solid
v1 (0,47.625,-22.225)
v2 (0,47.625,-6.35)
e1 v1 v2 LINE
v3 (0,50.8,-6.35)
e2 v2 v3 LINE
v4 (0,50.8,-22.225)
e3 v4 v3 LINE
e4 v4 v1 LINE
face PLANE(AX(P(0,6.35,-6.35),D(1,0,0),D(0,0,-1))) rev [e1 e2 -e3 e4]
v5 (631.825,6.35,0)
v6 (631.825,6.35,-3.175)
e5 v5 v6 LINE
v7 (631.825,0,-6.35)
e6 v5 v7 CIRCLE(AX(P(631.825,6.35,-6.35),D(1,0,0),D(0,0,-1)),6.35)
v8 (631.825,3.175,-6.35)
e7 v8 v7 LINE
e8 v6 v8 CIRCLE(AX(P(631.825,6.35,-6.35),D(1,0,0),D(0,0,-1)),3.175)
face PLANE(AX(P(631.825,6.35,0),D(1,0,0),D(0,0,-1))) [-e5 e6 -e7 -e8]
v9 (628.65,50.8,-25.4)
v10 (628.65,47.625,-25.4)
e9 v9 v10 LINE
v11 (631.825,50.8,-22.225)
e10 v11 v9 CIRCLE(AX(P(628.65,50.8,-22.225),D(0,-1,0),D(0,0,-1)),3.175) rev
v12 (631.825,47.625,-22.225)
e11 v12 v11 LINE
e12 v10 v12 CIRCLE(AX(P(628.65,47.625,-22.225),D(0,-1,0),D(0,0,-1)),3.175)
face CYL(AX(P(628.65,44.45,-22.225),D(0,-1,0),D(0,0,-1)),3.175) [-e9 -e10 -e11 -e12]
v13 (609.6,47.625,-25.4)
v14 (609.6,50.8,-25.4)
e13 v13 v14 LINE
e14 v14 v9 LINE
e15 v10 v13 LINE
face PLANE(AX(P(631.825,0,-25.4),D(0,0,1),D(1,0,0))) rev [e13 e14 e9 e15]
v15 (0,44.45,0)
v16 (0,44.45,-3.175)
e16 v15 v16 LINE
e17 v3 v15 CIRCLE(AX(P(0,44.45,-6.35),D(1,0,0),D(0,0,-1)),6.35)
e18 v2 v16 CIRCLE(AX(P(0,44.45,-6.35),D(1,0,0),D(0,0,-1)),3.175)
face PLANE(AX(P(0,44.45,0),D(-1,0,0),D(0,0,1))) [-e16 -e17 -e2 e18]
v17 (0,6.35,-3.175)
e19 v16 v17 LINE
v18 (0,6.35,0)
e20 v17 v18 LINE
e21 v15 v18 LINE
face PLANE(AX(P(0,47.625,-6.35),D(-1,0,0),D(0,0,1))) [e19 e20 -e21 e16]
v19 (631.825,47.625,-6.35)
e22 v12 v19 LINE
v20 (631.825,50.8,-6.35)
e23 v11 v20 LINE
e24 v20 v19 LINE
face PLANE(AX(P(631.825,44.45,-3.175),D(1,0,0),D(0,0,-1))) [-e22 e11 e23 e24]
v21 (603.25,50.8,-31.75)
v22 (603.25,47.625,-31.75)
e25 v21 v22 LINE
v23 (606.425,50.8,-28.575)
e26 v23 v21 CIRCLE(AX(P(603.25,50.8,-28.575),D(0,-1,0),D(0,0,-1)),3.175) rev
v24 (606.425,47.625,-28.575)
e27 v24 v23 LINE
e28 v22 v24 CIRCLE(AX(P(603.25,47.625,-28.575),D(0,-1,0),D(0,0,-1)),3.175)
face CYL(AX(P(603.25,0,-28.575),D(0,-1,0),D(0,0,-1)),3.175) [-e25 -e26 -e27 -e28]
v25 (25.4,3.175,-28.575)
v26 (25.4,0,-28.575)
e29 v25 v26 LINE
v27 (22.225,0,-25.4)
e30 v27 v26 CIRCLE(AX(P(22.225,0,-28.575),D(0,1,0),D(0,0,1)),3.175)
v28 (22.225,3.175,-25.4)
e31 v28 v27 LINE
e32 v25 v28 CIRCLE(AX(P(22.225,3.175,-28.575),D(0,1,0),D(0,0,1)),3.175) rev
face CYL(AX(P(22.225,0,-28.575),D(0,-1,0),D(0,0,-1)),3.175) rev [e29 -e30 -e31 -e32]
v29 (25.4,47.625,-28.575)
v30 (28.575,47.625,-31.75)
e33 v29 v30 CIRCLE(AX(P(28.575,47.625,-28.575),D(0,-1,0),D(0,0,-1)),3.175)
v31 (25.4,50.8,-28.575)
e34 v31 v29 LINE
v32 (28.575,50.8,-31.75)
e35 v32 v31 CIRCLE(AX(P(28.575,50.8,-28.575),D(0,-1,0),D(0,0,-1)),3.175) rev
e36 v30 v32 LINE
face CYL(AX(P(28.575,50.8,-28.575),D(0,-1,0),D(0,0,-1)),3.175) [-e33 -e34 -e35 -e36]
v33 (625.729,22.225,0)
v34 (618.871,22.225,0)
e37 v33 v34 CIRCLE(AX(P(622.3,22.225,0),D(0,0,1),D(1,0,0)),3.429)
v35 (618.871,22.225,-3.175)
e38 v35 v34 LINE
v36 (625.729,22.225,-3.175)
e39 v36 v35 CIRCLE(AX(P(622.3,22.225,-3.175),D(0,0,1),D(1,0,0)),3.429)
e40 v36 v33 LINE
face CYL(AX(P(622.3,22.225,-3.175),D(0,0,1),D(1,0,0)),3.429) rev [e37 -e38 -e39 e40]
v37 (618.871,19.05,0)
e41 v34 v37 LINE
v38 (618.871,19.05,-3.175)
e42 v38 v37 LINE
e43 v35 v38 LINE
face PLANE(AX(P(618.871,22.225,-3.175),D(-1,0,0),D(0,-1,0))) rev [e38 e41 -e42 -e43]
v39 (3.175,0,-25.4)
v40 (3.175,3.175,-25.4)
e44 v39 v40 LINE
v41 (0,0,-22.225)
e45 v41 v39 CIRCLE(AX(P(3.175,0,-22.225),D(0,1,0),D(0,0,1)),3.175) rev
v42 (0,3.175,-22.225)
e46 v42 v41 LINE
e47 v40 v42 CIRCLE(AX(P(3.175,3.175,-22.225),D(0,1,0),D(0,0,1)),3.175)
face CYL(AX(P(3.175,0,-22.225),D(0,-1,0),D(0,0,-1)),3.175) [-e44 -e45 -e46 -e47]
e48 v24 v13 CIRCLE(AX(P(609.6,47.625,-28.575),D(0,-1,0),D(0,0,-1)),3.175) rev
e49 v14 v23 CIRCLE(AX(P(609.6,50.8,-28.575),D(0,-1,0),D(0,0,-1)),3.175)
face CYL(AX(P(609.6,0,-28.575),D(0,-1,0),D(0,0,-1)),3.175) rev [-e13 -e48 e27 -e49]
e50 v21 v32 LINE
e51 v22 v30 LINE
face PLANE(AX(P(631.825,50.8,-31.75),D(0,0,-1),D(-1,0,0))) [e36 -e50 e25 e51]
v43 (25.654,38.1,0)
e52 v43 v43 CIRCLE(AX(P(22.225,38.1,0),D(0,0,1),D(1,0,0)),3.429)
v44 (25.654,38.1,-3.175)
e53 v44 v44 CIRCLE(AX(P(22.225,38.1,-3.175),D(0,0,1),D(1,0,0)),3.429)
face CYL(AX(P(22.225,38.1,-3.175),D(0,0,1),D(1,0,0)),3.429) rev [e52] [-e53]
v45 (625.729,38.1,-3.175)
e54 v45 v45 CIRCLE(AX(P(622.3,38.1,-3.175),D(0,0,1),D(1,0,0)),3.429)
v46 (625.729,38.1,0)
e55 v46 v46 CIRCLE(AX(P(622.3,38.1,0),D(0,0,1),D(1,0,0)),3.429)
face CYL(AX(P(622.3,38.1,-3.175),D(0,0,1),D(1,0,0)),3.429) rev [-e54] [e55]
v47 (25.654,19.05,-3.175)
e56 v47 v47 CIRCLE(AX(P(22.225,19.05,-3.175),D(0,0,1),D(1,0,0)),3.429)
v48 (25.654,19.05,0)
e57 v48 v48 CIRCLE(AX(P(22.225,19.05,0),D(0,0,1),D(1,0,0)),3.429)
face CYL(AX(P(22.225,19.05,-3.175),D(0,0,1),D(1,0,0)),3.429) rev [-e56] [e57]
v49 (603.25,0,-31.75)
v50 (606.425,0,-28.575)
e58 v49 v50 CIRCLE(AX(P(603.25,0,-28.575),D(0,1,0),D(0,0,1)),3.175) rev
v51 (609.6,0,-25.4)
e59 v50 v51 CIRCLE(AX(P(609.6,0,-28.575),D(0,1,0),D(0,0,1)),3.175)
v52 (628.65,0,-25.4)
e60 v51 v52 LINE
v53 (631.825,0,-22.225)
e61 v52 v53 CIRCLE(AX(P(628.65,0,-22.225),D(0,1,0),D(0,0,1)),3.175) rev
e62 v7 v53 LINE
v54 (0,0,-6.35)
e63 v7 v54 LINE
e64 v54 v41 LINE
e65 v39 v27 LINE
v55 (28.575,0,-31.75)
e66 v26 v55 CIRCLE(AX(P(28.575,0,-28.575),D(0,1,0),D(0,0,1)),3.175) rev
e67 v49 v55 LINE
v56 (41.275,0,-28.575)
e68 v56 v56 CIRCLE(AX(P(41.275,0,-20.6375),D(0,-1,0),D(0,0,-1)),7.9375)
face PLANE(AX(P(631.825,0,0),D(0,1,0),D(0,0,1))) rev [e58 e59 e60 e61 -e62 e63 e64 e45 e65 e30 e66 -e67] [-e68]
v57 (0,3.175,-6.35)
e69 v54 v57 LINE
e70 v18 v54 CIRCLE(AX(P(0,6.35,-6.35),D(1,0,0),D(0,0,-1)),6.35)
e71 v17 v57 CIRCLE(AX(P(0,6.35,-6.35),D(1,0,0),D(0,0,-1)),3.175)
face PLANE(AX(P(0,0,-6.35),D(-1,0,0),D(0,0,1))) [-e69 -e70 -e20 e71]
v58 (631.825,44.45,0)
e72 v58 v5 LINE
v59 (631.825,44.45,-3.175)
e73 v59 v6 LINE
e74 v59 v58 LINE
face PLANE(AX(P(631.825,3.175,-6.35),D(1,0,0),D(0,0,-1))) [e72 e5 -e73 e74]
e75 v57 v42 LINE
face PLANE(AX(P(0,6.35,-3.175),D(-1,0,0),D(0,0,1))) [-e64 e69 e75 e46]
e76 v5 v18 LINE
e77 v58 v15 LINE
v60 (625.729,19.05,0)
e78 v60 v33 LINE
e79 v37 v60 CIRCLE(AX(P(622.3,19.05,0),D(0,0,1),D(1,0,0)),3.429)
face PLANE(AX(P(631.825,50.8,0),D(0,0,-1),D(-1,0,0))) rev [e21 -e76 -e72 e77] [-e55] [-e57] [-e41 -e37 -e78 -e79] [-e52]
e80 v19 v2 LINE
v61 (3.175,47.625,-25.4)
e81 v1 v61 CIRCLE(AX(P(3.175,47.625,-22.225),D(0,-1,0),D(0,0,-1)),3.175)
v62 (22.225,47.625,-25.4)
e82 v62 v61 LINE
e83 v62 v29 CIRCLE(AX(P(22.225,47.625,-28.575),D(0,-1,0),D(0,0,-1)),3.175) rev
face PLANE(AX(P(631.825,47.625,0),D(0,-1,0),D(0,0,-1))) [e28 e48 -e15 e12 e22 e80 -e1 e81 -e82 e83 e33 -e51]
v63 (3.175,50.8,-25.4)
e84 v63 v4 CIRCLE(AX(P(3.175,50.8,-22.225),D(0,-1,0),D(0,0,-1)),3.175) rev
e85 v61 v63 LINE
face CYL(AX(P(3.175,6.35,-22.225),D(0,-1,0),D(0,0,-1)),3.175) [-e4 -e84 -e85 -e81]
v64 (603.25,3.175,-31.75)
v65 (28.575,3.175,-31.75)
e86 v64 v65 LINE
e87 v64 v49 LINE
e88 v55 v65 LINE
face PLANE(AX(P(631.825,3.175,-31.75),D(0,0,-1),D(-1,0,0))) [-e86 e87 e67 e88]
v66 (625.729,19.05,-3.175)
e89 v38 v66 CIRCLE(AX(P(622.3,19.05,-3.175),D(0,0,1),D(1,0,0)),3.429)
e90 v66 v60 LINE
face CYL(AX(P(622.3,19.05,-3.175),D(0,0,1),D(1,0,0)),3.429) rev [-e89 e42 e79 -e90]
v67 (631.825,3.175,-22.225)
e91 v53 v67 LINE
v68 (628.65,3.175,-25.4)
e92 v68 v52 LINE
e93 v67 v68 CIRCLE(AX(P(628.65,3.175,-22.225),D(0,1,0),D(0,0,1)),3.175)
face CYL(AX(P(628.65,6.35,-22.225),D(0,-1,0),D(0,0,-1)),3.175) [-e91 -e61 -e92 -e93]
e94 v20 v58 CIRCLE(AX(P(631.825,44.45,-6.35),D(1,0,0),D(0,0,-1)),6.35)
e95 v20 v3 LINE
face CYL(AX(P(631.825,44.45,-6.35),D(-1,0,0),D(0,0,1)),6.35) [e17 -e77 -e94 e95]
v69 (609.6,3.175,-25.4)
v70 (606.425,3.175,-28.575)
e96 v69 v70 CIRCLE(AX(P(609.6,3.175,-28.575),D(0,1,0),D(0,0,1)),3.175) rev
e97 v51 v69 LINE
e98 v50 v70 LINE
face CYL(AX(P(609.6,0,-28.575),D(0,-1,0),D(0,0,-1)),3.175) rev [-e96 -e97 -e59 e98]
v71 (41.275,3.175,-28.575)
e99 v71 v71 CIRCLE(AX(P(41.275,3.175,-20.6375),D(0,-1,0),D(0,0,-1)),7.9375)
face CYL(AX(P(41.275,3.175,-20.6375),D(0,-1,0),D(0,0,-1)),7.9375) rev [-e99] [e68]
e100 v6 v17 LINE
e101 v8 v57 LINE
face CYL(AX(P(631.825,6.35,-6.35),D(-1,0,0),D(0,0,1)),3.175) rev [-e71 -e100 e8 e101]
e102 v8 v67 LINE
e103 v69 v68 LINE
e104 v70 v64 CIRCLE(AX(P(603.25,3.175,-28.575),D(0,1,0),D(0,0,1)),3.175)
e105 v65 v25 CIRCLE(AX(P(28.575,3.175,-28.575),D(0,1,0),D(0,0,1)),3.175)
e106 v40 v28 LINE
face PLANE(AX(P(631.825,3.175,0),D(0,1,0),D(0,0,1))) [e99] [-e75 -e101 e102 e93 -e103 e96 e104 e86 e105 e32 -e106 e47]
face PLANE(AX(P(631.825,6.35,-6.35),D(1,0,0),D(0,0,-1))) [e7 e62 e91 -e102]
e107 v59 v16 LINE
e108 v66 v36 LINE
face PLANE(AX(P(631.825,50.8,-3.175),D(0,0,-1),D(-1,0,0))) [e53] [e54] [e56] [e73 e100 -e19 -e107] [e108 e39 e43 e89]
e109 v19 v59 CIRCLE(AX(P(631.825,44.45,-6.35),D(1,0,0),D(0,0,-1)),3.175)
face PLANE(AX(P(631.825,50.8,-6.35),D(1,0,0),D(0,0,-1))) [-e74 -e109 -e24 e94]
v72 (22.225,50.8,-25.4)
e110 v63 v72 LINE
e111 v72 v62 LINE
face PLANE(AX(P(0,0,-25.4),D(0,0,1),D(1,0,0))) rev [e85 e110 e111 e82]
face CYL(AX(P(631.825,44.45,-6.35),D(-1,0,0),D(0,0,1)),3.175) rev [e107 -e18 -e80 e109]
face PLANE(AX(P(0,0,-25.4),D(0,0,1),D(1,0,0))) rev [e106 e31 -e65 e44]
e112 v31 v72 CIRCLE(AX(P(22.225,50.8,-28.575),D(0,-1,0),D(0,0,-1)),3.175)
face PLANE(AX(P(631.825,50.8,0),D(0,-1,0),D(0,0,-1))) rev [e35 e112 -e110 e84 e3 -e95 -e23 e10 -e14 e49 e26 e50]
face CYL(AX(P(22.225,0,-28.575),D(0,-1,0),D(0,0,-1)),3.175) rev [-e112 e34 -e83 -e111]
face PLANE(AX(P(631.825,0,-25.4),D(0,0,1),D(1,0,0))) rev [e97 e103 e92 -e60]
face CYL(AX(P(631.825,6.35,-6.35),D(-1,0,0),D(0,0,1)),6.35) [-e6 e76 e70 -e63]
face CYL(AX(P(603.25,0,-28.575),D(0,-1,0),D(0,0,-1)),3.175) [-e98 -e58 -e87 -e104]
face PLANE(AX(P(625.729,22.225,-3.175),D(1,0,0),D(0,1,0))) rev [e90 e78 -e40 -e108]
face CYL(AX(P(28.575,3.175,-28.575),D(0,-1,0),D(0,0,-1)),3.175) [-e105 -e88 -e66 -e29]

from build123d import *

# Parameters (mm, degrees)
BASE_FLANGE1_DEPTH = 631.825
SKETCH2_W          = 25.4
SKETCH2_H          = 6.35
CUT_EXTRUDE1_DEPTH = 50.8
SKETCH3_R          = 3.429
CUT_EXTRUDE2_DEPTH = 3.175
FILLET1_R          = 3.175
SKETCH4_R          = 7.9375
CUT_EXTRUDE3_DEPTH = 3.175


# Sheet-metal steps are written as plain solids
with BuildPart() as part:
    # Sketch1 → Base-Flange1 (new body)
    with BuildSketch(Plane(origin=(0, 0, 0), x_dir=(0, 0, -1), z_dir=(1, 0, 0))):
        with BuildLine():
            Line((31.75, 50.8), (6.35, 50.8))
            ThreePointArc((6.35, 50.8), (1.859871939, 48.940128061), (0, 44.45))
            Line((0, 44.45), (0, 6.35))
            ThreePointArc((0, 6.35), (1.859871939, 1.859871939), (6.35, 0))
            Line((6.35, 0), (31.75, 0))
            Line((31.75, 0), (31.75, 3.175))
            Line((31.75, 3.175), (6.35, 3.175))
            ThreePointArc((6.35, 3.175), (4.10493597, 4.10493597), (3.175, 6.35))
            Line((3.175, 6.35), (3.175, 44.45))
            ThreePointArc((3.175, 44.45), (4.10493597, 46.69506403), (6.35, 47.625))
            Line((6.35, 47.625), (31.75, 47.625))
            Line((31.75, 47.625), (31.75, 50.8))
        make_face()
    extrude(amount=BASE_FLANGE1_DEPTH)

    # Sketch2 → Cut-Extrude1 (cut)
    with BuildSketch(Plane(origin=(0, 50.8, 0), x_dir=(1, 0, 0), z_dir=(0, 1, 0))):
        with Locations((12.7, 28.575)):
            Rectangle(SKETCH2_W, SKETCH2_H)
        with Locations((619.125, 28.575)):
            Rectangle(SKETCH2_W, SKETCH2_H)
    extrude(amount=-CUT_EXTRUDE1_DEPTH, mode=Mode.SUBTRACT)

    # Sketch3 → Cut-Extrude2 (cut)
    with BuildSketch(Plane.XY):
        with Locations((22.225, 19.05)):
            Circle(SKETCH3_R)
        with Locations((22.225, 38.1)):
            Circle(SKETCH3_R)
        with Locations((622.3, 38.1)):
            Circle(SKETCH3_R)
        with BuildLine():
            Line((618.871, 22.225), (618.871, 19.05))
            ThreePointArc((618.871, 19.05), (622.3, 15.621), (625.729, 19.05))
            Line((625.729, 19.05), (625.729, 22.225))
            ThreePointArc((625.729, 22.225), (622.3, 25.654), (618.871, 22.225))
        make_face()
    extrude(amount=-CUT_EXTRUDE2_DEPTH, mode=Mode.SUBTRACT)

    # Fillet1
    fillet1_edges = [part.edges().sort_by_distance(p)[0] for p in [
        (0, 49.2125, -25.4),
        (25.4, 49.2125, -31.75),
        (0, 1.5875, -25.4),
        (25.4, 1.5875, -31.75),
        (606.425, 1.5875, -31.75),
        (606.425, 49.2125, -31.75),
        (631.825, 1.5875, -25.4),
        (631.825, 49.2125, -25.4),
        (606.425, 1.5875, -25.4),
        (606.425, 49.2125, -25.4),
        (25.4, 1.5875, -25.4),
        (25.4, 49.2125, -25.4),
    ]]
    fillet(fillet1_edges, radius=FILLET1_R - 0.0001)  # a hair under: the kernel refuses the full size

    # Sketch4 → Cut-Extrude3 (cut)
    with BuildSketch(Plane.XZ):
        with Locations(Location((41.275, -20.6375, 0), (0, 0, 270))):
            Circle(SKETCH4_R)
    extrude(amount=-CUT_EXTRUDE3_DEPTH, mode=Mode.SUBTRACT)


solid = part.part
